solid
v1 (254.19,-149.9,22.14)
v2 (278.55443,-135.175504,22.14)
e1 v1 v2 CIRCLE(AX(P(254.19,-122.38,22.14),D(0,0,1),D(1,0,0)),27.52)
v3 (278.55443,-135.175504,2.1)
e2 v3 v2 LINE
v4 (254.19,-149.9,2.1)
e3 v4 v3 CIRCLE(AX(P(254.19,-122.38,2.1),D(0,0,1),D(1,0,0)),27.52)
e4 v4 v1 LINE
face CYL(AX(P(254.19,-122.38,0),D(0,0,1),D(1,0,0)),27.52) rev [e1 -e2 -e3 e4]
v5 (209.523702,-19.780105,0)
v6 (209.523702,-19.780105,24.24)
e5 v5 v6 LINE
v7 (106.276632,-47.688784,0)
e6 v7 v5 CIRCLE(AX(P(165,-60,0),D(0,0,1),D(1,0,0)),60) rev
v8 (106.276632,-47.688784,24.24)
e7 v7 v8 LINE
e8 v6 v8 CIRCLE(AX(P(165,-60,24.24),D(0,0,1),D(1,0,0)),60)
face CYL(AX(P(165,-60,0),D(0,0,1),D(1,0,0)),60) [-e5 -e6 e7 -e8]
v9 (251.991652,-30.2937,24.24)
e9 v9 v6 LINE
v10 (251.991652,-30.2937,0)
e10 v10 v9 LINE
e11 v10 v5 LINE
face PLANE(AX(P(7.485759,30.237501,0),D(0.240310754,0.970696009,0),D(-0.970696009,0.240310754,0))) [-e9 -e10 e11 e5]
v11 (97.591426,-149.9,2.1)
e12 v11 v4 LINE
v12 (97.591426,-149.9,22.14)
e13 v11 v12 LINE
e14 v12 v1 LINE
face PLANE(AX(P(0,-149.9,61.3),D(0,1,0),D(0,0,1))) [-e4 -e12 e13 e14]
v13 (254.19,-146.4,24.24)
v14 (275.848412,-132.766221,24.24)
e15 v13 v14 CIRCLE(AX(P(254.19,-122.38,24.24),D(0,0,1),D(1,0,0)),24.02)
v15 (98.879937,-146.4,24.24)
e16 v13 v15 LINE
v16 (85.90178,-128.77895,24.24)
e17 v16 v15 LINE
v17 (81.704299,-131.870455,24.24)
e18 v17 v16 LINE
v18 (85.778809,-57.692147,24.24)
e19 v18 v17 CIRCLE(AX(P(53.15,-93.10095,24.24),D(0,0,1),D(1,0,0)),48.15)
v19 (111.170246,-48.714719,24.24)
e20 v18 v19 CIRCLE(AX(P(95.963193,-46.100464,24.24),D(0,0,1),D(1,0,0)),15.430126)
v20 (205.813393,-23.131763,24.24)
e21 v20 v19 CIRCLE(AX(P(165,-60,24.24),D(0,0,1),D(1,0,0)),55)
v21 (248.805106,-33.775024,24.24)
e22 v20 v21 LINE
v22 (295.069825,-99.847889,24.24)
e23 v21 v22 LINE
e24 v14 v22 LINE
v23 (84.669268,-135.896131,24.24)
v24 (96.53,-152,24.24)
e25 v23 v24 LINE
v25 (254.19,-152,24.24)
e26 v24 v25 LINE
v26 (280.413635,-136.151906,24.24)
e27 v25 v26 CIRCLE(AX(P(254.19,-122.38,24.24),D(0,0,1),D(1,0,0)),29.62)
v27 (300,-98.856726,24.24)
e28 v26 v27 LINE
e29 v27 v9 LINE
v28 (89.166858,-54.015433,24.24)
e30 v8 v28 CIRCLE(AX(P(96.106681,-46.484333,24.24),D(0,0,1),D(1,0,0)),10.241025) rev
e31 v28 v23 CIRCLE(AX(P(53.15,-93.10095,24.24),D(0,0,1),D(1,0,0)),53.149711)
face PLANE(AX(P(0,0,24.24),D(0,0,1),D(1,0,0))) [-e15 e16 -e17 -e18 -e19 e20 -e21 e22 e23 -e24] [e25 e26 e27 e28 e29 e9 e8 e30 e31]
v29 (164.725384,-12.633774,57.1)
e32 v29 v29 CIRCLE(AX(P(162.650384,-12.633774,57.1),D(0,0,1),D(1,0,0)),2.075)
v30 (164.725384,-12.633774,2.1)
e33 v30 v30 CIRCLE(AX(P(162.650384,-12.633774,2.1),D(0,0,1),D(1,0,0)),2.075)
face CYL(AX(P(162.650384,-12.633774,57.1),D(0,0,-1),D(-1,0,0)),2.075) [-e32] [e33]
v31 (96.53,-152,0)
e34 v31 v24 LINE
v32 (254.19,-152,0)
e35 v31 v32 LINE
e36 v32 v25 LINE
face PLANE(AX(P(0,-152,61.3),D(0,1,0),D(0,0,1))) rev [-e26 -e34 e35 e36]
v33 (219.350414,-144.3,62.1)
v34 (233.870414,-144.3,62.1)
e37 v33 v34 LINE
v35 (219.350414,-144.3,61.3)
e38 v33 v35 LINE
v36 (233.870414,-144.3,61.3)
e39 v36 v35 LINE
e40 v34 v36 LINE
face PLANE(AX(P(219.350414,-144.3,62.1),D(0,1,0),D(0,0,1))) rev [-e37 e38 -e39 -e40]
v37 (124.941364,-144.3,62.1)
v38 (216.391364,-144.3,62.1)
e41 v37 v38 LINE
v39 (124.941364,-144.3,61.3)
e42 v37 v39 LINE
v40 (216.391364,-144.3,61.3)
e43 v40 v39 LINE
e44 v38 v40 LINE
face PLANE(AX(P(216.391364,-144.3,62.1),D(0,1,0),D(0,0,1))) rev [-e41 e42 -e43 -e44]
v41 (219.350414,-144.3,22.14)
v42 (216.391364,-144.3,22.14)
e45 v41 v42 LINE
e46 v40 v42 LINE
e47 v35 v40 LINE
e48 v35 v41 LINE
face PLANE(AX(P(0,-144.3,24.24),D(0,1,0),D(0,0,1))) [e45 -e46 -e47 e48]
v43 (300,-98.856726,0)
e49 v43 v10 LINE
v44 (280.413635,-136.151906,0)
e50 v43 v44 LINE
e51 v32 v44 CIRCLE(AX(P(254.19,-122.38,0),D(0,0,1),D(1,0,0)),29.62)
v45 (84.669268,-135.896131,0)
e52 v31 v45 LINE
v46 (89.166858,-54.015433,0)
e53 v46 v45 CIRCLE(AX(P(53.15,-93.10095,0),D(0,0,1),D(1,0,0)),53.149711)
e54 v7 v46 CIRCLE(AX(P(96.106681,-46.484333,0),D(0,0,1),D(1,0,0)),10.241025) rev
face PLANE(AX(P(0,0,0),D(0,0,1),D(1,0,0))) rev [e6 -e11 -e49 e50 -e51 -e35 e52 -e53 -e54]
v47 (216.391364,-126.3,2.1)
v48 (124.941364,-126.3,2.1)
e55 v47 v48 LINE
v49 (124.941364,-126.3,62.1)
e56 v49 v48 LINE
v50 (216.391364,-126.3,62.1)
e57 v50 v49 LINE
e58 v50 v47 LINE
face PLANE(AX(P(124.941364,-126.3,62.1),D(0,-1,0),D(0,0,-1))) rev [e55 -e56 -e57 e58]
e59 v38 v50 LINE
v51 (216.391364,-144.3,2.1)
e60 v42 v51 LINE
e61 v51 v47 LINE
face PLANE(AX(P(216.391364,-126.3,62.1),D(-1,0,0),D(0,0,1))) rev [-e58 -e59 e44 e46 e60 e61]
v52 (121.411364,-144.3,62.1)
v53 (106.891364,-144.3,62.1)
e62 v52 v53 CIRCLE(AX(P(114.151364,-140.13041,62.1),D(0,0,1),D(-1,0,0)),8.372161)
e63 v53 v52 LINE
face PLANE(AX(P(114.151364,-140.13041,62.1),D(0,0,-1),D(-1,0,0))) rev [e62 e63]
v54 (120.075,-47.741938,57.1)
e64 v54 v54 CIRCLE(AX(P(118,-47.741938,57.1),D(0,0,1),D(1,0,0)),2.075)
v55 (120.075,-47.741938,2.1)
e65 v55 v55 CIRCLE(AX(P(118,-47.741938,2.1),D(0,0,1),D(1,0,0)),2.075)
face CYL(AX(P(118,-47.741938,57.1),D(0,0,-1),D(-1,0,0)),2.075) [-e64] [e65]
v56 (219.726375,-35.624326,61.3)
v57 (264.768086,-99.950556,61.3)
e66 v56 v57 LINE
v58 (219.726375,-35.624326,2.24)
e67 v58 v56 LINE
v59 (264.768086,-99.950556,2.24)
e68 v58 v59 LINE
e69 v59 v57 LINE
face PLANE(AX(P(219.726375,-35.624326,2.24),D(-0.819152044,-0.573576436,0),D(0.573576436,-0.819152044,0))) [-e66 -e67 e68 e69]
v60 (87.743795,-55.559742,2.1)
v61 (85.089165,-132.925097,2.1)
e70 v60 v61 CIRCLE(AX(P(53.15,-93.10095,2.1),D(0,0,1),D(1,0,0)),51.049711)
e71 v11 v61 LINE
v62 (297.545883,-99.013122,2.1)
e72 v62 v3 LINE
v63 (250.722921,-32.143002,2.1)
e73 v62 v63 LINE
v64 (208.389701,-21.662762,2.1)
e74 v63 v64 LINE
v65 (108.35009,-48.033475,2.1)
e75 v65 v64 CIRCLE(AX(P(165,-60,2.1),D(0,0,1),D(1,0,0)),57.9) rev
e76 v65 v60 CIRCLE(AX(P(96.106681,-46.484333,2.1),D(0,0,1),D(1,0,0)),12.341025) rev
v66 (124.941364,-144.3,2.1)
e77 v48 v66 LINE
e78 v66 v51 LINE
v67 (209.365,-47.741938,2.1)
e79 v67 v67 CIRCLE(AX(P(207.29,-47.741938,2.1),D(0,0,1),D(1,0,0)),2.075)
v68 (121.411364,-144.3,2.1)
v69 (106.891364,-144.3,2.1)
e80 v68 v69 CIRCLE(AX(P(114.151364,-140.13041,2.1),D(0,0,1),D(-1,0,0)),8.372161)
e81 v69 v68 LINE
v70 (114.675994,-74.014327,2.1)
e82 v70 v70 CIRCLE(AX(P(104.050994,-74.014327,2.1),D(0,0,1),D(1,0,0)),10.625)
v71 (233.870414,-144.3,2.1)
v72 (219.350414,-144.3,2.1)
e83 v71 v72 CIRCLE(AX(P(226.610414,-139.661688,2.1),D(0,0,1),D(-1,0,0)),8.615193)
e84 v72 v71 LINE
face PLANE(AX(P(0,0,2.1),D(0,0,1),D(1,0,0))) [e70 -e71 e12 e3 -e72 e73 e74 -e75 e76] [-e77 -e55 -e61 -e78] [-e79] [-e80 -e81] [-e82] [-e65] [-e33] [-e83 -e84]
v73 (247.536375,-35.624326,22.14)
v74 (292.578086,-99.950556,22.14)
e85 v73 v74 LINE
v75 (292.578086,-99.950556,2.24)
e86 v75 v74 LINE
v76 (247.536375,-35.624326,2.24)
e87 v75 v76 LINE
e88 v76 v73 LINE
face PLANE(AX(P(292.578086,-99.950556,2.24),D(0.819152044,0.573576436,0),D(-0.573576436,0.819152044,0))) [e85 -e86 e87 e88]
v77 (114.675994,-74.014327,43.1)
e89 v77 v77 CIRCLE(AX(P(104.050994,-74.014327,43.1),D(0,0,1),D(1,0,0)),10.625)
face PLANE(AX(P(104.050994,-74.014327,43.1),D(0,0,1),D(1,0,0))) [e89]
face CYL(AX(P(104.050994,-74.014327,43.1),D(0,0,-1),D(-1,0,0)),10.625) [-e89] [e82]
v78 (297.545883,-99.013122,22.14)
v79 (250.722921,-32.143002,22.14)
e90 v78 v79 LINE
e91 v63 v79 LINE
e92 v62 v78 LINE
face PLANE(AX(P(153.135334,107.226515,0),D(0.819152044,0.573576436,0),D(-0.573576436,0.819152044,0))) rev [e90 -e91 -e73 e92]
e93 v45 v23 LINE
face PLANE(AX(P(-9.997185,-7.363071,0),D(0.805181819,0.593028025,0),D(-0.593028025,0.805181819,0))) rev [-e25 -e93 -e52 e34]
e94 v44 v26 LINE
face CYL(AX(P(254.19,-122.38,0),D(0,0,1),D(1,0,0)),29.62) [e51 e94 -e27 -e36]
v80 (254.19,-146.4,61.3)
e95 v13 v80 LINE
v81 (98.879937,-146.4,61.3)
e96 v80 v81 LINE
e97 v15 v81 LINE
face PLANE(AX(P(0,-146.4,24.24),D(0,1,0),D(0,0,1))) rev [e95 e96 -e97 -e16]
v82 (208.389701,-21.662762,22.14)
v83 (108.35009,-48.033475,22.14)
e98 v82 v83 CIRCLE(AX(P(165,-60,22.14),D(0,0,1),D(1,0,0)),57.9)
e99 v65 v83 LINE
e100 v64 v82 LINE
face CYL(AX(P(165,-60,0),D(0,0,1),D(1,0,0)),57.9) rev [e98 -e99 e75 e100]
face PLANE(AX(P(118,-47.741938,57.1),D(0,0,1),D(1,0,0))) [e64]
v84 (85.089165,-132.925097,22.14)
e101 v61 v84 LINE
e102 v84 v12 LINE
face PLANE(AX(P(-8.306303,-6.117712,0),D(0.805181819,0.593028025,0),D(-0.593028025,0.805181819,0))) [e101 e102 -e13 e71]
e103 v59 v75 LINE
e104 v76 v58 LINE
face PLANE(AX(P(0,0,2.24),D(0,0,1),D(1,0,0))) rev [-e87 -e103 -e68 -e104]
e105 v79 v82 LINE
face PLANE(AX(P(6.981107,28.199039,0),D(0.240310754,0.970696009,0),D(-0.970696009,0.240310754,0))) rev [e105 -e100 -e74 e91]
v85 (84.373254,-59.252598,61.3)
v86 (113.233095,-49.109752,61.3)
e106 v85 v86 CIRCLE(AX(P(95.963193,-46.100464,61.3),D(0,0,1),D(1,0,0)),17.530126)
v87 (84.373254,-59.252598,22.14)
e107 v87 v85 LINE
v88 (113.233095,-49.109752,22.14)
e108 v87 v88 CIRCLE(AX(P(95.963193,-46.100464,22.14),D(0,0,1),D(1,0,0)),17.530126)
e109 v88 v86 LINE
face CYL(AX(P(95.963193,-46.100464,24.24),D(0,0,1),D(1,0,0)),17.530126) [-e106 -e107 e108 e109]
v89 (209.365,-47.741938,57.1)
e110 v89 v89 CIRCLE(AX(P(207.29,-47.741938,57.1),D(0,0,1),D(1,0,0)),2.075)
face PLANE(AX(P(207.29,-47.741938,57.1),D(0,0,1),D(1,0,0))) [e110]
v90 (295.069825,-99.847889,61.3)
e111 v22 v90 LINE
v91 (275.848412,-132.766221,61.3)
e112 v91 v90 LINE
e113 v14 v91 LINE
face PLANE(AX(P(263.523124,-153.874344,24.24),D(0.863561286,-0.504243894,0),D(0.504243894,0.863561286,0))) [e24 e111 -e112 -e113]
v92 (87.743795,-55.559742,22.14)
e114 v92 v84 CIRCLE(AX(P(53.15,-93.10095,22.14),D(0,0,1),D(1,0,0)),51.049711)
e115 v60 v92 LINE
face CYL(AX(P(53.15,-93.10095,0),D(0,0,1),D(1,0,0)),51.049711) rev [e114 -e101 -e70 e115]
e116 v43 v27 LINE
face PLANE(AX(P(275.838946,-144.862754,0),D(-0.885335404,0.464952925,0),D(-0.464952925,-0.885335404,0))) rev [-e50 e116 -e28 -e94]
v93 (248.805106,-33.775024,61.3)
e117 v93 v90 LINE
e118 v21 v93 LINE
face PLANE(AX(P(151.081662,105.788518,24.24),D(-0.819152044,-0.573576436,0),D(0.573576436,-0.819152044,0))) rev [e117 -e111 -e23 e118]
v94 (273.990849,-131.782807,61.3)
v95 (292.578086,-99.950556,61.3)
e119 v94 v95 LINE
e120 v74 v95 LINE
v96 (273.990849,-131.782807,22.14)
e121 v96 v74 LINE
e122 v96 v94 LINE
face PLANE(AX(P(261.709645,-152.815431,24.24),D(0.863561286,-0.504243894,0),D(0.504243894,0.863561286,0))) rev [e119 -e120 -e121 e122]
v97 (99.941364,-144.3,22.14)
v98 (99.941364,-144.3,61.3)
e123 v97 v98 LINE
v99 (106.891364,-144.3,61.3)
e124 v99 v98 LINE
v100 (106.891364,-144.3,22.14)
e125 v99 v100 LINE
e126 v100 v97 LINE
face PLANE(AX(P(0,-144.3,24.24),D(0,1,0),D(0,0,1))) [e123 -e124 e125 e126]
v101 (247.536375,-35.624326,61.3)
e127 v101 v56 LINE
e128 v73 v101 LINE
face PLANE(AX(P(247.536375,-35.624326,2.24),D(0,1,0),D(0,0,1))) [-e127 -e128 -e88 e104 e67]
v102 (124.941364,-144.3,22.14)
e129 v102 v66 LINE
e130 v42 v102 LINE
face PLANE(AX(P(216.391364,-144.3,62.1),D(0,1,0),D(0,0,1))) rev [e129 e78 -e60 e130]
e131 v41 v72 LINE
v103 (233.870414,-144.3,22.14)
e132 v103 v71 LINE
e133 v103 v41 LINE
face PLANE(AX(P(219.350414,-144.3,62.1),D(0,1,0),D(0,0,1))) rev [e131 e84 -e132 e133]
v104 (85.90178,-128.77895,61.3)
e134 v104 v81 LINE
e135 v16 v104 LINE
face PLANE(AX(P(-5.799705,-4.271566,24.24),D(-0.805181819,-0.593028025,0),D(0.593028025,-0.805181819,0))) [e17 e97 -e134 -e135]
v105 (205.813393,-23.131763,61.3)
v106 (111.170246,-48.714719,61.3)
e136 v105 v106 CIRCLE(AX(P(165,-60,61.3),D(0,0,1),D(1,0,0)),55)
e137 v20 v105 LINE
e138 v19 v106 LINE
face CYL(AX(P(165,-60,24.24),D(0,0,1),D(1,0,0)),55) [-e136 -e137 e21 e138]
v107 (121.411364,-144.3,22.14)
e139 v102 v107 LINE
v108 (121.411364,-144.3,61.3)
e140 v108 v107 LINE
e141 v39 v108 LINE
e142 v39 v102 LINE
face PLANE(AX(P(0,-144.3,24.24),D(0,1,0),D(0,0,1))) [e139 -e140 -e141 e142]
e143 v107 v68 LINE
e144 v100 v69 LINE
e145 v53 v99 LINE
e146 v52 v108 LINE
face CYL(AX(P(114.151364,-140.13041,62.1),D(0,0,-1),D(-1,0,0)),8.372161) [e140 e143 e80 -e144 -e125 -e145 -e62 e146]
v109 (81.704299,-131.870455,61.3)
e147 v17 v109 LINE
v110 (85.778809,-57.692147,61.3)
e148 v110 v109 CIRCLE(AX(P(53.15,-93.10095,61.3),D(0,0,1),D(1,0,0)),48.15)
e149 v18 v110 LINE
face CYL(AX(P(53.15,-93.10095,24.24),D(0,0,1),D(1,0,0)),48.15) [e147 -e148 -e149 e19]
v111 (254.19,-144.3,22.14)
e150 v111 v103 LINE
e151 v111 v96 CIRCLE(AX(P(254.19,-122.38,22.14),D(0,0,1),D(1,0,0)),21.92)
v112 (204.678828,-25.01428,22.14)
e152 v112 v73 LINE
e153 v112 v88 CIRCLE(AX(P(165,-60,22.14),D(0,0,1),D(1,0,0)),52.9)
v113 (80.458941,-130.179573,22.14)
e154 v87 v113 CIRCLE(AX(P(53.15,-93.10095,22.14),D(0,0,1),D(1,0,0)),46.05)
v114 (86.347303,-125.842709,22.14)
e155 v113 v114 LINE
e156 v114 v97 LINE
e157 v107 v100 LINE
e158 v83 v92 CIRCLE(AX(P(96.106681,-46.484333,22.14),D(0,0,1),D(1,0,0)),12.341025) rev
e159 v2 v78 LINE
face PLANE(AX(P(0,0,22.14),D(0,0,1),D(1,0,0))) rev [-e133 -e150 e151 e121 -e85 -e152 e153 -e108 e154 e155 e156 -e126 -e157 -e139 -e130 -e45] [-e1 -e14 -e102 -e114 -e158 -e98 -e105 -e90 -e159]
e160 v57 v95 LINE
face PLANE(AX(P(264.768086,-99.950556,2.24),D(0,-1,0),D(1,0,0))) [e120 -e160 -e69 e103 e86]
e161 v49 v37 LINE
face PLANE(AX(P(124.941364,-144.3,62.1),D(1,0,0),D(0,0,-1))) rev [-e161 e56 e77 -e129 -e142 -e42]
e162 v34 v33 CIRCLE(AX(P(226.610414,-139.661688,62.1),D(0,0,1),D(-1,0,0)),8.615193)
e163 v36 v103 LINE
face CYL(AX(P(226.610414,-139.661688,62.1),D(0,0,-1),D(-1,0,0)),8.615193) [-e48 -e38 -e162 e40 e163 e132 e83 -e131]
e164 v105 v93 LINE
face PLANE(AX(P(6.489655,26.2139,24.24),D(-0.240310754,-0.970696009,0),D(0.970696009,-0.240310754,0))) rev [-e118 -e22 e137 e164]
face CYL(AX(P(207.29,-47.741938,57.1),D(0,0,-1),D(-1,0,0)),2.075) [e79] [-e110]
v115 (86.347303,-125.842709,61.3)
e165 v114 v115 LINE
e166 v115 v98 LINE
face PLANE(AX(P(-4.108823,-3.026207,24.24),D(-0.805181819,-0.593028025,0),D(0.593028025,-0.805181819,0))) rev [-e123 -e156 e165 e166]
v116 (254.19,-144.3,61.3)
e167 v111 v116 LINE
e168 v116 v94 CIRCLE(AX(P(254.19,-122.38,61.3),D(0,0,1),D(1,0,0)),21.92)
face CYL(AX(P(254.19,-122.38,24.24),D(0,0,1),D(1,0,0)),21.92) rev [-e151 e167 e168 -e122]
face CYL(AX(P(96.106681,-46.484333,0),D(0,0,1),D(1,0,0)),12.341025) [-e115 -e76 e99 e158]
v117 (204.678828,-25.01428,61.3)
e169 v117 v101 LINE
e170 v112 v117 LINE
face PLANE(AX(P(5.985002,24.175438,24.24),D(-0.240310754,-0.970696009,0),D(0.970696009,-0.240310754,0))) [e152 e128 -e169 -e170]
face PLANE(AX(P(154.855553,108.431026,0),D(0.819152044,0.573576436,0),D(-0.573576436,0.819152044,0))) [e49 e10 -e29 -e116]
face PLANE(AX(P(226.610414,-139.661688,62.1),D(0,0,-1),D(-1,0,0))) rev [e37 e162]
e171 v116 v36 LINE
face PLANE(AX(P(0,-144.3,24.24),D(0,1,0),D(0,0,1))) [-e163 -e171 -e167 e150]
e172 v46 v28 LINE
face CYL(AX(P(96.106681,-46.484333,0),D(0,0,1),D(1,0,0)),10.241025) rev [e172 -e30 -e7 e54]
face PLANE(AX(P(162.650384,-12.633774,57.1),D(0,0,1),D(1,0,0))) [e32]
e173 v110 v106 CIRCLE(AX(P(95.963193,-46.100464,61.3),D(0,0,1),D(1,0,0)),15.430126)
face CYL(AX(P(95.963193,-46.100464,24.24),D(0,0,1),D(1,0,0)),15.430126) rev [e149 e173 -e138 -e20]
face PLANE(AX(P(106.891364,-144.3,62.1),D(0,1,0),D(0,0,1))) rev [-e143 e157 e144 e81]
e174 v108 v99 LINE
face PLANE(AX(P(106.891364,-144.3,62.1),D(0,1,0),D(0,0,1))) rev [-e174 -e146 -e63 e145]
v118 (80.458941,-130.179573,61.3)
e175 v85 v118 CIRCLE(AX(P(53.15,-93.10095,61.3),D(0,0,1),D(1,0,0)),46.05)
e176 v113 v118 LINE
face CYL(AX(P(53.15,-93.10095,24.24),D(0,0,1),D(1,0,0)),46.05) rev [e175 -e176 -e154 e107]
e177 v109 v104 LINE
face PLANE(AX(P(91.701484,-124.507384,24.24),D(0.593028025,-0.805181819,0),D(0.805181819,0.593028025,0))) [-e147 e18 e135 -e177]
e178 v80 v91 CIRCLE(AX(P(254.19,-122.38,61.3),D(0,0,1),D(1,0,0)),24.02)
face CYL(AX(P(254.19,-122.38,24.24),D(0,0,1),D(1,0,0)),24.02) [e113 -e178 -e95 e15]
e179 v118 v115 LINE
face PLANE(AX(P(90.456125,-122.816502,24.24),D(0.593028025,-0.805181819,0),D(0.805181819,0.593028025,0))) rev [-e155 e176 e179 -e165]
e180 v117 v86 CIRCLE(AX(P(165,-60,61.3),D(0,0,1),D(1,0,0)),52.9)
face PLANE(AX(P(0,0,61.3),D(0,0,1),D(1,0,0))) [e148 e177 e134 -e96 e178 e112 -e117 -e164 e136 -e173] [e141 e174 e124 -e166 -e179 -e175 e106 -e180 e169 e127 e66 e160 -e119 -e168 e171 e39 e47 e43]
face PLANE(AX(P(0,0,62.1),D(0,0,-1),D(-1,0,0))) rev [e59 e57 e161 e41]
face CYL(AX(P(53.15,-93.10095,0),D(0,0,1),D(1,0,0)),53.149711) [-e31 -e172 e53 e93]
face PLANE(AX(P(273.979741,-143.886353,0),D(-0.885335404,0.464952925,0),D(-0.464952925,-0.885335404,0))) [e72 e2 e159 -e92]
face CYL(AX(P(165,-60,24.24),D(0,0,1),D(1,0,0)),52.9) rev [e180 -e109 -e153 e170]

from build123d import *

# Parameters (mm, degrees)
SKETCH1_W           = 300
SKETCH1_H           = 152
BOSS_EXTRUDE1_DEPTH = 61.3
CUT_EXTRUDE1_DEPTH  = 342.850391253
CUT_EXTRUDE2_DEPTH  = 37.06
SHELL2_START        = 2.1
SHELL2_DEPTH        = 59.2
SHELL2_2_DEPTH      = 20.04
BOSS_EXTRUDE3_DEPTH = 59.06
SKETCH10_R          = 2.075
BOSS_EXTRUDE4_DEPTH = 55
SKETCH11_R          = 10.625
BOSS_EXTRUDE7_DEPTH = 41
SKETCH12_W          = 91.45
SKETCH12_H          = 18
BOSS_EXTRUDE8_DEPTH = 60


# Read off the part's stored shape, not the designer's step: Shell2
with BuildPart() as part:
    # Sketch1 → Boss-Extrude1 (new body)
    with BuildSketch(Plane.XY):
        with Locations((150, -76)):
            Rectangle(SKETCH1_W, SKETCH1_H)
    extrude(amount=BOSS_EXTRUDE1_DEPTH)

    # Sketch2 → Cut-Extrude1 (cut, through all)
    with BuildSketch(Plane.XY.offset(61.3)):
        with BuildLine():
            ThreePointArc((106.276631817, -47.688784415), (127.175886892, -13.423863754), (165, 0))
            Line((165, 0), (0, 0))
            Line((0, 0), (0, -152))
            Line((0, -152), (96.53, -152))
            Line((96.53, -152), (84.669267872, -135.896130578))
            ThreePointArc((84.669267872, -135.896130578), (0.080288741, -90.185905943), (89.166858478, -54.015432913))
            ThreePointArc((89.166858478, -54.015432913), (99.658448556, -56.089724813), (106.276631817, -47.688784415))
        make_face()
        with BuildLine():
            Line((209.523701897, -19.780104806), (251.991652277, -30.293700311))
            Line((251.991652277, -30.293700311), (300, -98.856726418))
            Line((300, -98.856726418), (300, 0))
            Line((300, 0), (165, 0))
            ThreePointArc((165, 0), (189.359867491, -5.16755654), (209.523701897, -19.780104806))
        make_face()
        with BuildLine():
            Line((300, -152), (300, -98.856726418))
            Line((300, -98.856726418), (280.413634666, -136.151905638))
            ThreePointArc((280.413634666, -136.151905638), (269.510257097, -147.730229239), (254.19, -152))
            Line((254.19, -152), (300, -152))
        make_face()
    extrude(amount=-CUT_EXTRUDE1_DEPTH, mode=Mode.SUBTRACT)

    # Sketch3 → Cut-Extrude2 (cut)
    with BuildSketch(Plane.XY.offset(61.3)):
        with BuildLine():
            ThreePointArc((105.977880822, -49.211605878), (98.92047416, -56.331219446), (89.166858478, -54.015432913))
            ThreePointArc((89.166858478, -54.015432913), (0.080288741, -90.185905943), (84.669267872, -135.896130578))
            Line((84.669267872, -135.896130578), (96.53, -152))
            Line((96.53, -152), (254.19, -152))
            ThreePointArc((254.19, -152), (269.510257097, -147.730229239), (280.413634666, -136.151905638))
            Line((280.413634666, -136.151905638), (300, -98.856726418))
            Line((300, -98.856726418), (251.991652277, -30.293700311))
            Line((251.991652277, -30.293700311), (209.523701897, -19.780104806))
            ThreePointArc((209.523701897, -19.780104806), (149.343332729, -2.078770991), (106.276631817, -47.688784415))
            ThreePointArc((106.276631817, -47.688784415), (106.15614248, -48.455862107), (105.977880822, -49.211605878))
        make_face()
        with BuildLine():
            ThreePointArc((111.170245832, -48.714719047), (150.648055001, -6.905540075), (205.813393405, -23.131762739))
            Line((205.813393405, -23.131762739), (248.805105887, -33.775023623))
            Line((248.805105887, -33.775023623), (295.06982456, -99.847889378))
            Line((295.06982456, -99.847889378), (275.848412222, -132.766220681))
            ThreePointArc((275.848412222, -132.766220681), (266.986159175, -142.707781738), (254.19, -146.4))
            Line((254.19, -146.4), (98.879937279, -146.4))
            Line((98.879937279, -146.4), (85.901779611, -128.778949784))
            Line((85.901779611, -128.778949784), (81.704299385, -131.870454519))
            ThreePointArc((81.704299385, -131.870454519), (5.072473907, -90.460119595), (85.77880864, -57.692146685))
            ThreePointArc((85.77880864, -57.692146685), (101.106669521, -60.648090535), (111.170245832, -48.714719047))
        make_face(mode=Mode.SUBTRACT)
    extrude(amount=-CUT_EXTRUDE2_DEPTH, mode=Mode.SUBTRACT)

    # Shell2 outline → Shell2 (cut)
    with BuildSketch(Plane.XY.offset(SHELL2_START)):
        with BuildLine():
            Line((99.941363565, -144.3), (254.19, -144.3))
            ThreePointArc((254.19, -144.3), (265.902746491, -140.908301855), (273.990848772, -131.782807449))
            Line((273.990848772, -131.782807449), (292.5780859, -99.950556049))
            Line((292.5780859, -99.950556049), (247.536374557, -35.624325774))
            Line((247.536374557, -35.624325774), (204.678827772, -25.014279675))
            ThreePointArc((204.678827772, -25.014279675), (151.521188692, -8.846000687), (113.233094528, -49.109752168))
            ThreePointArc((113.233094528, -49.109752168), (101.775664547, -62.638918954), (84.37325412, -59.25259838))
            ThreePointArc((84.37325412, -59.25259838), (7.169967657, -90.563406667), (80.458940533, -130.179572699))
            Line((80.458940533, -130.179572699), (86.34730258, -125.842709112))
            Line((86.34730258, -125.842709112), (99.941363565, -144.3))
        make_face()
    extrude(amount=SHELL2_DEPTH, mode=Mode.SUBTRACT)

    # Shell2 2 outline → Shell2 2 (cut)
    with BuildSketch(Plane.XY.offset(SHELL2_START)):
        with BuildLine():
            Line((97.591426286, -149.9), (254.19, -149.9))
            ThreePointArc((254.19, -149.9), (268.424080868, -145.932947626), (278.554430318, -135.175504495))
            Line((278.554430318, -135.175504495), (297.545882937, -99.013122297))
            Line((297.545882937, -99.013122297), (250.722920948, -32.143002462))
            Line((250.722920948, -32.143002462), (208.389700931, -21.662761535))
            ThreePointArc((208.389700931, -21.662761535), (150.241547582, -4.012518522), (108.350090196, -48.033475058))
            ThreePointArc((108.350090196, -48.033475058), (100.340566871, -58.076361401), (87.743795173, -55.559742089))
            ThreePointArc((87.743795173, -55.559742089), (2.130315246, -91.350316403), (85.089165222, -132.925096807))
            Line((85.089165222, -132.925096807), (97.591426286, -149.9))
        make_face()
        with BuildLine():
            ThreePointArc((273.990848772, -131.782807449), (265.902746491, -140.908301855), (254.19, -144.3))
            Line((254.19, -144.3), (99.941363565, -144.3))
            Line((99.941363565, -144.3), (86.34730258, -125.842709112))
            Line((86.34730258, -125.842709112), (80.458940533, -130.179572699))
            ThreePointArc((80.458940533, -130.179572699), (7.169967657, -90.563406667), (84.37325412, -59.25259838))
            ThreePointArc((84.37325412, -59.25259838), (101.775664547, -62.638918954), (113.233094528, -49.109752168))
            ThreePointArc((113.233094528, -49.109752168), (151.521188692, -8.846000687), (204.678827772, -25.014279675))
            Line((204.678827772, -25.014279675), (247.536374557, -35.624325774))
            Line((247.536374557, -35.624325774), (292.5780859, -99.950556049))
            Line((292.5780859, -99.950556049), (273.990848772, -131.782807449))
        make_face(mode=Mode.SUBTRACT)
    extrude(amount=SHELL2_2_DEPTH, mode=Mode.SUBTRACT)

    # Sketch9 → Boss-Extrude3 (add)
    with BuildSketch(Plane.XY.offset(61.3)):
        Polygon((247.536374557, -35.624325774), (219.726374557, -35.624325774), (264.7680859, -99.950556049), (292.5780859, -99.950556049), (248.135467364, -36.479918971), align=None)
    extrude(amount=-BOSS_EXTRUDE3_DEPTH)

    # Sketch10 → Boss-Extrude4 (add)
    with BuildSketch(Plane.XY.offset(2.1)):
        with Locations((118, -47.741938271)):
            Circle(SKETCH10_R)
        with Locations((207.29, -47.741938271)):
            Circle(SKETCH10_R)
        with Locations((162.650383795, -12.633773594)):
            Circle(SKETCH10_R)
    extrude(amount=BOSS_EXTRUDE4_DEPTH)

    # Sketch11 → Boss-Extrude7 (add)
    with BuildSketch(Plane.XY.offset(2.1)):
        with Locations((104.050993742, -74.01432733)):
            Circle(SKETCH11_R)
    extrude(amount=BOSS_EXTRUDE7_DEPTH)

    # Sketch12 → Boss-Extrude8 (add)
    with BuildSketch(Plane.XY.offset(2.1)):
        with Locations((170.666363565, -135.3)):
            Rectangle(SKETCH12_W, SKETCH12_H)
        with BuildLine():
            Line((106.891363565, -144.3), (121.411363565, -144.3))
            ThreePointArc((121.411363565, -144.3), (114.151363565, -131.75824963), (106.891363565, -144.3))
        make_face()
        with BuildLine():
            Line((219.350413724, -144.3), (233.870413724, -144.3))
            ThreePointArc((233.870413724, -144.3), (226.610413724, -131.046495008), (219.350413724, -144.3))
        make_face()
    extrude(amount=BOSS_EXTRUDE8_DEPTH)


solid = part.part
